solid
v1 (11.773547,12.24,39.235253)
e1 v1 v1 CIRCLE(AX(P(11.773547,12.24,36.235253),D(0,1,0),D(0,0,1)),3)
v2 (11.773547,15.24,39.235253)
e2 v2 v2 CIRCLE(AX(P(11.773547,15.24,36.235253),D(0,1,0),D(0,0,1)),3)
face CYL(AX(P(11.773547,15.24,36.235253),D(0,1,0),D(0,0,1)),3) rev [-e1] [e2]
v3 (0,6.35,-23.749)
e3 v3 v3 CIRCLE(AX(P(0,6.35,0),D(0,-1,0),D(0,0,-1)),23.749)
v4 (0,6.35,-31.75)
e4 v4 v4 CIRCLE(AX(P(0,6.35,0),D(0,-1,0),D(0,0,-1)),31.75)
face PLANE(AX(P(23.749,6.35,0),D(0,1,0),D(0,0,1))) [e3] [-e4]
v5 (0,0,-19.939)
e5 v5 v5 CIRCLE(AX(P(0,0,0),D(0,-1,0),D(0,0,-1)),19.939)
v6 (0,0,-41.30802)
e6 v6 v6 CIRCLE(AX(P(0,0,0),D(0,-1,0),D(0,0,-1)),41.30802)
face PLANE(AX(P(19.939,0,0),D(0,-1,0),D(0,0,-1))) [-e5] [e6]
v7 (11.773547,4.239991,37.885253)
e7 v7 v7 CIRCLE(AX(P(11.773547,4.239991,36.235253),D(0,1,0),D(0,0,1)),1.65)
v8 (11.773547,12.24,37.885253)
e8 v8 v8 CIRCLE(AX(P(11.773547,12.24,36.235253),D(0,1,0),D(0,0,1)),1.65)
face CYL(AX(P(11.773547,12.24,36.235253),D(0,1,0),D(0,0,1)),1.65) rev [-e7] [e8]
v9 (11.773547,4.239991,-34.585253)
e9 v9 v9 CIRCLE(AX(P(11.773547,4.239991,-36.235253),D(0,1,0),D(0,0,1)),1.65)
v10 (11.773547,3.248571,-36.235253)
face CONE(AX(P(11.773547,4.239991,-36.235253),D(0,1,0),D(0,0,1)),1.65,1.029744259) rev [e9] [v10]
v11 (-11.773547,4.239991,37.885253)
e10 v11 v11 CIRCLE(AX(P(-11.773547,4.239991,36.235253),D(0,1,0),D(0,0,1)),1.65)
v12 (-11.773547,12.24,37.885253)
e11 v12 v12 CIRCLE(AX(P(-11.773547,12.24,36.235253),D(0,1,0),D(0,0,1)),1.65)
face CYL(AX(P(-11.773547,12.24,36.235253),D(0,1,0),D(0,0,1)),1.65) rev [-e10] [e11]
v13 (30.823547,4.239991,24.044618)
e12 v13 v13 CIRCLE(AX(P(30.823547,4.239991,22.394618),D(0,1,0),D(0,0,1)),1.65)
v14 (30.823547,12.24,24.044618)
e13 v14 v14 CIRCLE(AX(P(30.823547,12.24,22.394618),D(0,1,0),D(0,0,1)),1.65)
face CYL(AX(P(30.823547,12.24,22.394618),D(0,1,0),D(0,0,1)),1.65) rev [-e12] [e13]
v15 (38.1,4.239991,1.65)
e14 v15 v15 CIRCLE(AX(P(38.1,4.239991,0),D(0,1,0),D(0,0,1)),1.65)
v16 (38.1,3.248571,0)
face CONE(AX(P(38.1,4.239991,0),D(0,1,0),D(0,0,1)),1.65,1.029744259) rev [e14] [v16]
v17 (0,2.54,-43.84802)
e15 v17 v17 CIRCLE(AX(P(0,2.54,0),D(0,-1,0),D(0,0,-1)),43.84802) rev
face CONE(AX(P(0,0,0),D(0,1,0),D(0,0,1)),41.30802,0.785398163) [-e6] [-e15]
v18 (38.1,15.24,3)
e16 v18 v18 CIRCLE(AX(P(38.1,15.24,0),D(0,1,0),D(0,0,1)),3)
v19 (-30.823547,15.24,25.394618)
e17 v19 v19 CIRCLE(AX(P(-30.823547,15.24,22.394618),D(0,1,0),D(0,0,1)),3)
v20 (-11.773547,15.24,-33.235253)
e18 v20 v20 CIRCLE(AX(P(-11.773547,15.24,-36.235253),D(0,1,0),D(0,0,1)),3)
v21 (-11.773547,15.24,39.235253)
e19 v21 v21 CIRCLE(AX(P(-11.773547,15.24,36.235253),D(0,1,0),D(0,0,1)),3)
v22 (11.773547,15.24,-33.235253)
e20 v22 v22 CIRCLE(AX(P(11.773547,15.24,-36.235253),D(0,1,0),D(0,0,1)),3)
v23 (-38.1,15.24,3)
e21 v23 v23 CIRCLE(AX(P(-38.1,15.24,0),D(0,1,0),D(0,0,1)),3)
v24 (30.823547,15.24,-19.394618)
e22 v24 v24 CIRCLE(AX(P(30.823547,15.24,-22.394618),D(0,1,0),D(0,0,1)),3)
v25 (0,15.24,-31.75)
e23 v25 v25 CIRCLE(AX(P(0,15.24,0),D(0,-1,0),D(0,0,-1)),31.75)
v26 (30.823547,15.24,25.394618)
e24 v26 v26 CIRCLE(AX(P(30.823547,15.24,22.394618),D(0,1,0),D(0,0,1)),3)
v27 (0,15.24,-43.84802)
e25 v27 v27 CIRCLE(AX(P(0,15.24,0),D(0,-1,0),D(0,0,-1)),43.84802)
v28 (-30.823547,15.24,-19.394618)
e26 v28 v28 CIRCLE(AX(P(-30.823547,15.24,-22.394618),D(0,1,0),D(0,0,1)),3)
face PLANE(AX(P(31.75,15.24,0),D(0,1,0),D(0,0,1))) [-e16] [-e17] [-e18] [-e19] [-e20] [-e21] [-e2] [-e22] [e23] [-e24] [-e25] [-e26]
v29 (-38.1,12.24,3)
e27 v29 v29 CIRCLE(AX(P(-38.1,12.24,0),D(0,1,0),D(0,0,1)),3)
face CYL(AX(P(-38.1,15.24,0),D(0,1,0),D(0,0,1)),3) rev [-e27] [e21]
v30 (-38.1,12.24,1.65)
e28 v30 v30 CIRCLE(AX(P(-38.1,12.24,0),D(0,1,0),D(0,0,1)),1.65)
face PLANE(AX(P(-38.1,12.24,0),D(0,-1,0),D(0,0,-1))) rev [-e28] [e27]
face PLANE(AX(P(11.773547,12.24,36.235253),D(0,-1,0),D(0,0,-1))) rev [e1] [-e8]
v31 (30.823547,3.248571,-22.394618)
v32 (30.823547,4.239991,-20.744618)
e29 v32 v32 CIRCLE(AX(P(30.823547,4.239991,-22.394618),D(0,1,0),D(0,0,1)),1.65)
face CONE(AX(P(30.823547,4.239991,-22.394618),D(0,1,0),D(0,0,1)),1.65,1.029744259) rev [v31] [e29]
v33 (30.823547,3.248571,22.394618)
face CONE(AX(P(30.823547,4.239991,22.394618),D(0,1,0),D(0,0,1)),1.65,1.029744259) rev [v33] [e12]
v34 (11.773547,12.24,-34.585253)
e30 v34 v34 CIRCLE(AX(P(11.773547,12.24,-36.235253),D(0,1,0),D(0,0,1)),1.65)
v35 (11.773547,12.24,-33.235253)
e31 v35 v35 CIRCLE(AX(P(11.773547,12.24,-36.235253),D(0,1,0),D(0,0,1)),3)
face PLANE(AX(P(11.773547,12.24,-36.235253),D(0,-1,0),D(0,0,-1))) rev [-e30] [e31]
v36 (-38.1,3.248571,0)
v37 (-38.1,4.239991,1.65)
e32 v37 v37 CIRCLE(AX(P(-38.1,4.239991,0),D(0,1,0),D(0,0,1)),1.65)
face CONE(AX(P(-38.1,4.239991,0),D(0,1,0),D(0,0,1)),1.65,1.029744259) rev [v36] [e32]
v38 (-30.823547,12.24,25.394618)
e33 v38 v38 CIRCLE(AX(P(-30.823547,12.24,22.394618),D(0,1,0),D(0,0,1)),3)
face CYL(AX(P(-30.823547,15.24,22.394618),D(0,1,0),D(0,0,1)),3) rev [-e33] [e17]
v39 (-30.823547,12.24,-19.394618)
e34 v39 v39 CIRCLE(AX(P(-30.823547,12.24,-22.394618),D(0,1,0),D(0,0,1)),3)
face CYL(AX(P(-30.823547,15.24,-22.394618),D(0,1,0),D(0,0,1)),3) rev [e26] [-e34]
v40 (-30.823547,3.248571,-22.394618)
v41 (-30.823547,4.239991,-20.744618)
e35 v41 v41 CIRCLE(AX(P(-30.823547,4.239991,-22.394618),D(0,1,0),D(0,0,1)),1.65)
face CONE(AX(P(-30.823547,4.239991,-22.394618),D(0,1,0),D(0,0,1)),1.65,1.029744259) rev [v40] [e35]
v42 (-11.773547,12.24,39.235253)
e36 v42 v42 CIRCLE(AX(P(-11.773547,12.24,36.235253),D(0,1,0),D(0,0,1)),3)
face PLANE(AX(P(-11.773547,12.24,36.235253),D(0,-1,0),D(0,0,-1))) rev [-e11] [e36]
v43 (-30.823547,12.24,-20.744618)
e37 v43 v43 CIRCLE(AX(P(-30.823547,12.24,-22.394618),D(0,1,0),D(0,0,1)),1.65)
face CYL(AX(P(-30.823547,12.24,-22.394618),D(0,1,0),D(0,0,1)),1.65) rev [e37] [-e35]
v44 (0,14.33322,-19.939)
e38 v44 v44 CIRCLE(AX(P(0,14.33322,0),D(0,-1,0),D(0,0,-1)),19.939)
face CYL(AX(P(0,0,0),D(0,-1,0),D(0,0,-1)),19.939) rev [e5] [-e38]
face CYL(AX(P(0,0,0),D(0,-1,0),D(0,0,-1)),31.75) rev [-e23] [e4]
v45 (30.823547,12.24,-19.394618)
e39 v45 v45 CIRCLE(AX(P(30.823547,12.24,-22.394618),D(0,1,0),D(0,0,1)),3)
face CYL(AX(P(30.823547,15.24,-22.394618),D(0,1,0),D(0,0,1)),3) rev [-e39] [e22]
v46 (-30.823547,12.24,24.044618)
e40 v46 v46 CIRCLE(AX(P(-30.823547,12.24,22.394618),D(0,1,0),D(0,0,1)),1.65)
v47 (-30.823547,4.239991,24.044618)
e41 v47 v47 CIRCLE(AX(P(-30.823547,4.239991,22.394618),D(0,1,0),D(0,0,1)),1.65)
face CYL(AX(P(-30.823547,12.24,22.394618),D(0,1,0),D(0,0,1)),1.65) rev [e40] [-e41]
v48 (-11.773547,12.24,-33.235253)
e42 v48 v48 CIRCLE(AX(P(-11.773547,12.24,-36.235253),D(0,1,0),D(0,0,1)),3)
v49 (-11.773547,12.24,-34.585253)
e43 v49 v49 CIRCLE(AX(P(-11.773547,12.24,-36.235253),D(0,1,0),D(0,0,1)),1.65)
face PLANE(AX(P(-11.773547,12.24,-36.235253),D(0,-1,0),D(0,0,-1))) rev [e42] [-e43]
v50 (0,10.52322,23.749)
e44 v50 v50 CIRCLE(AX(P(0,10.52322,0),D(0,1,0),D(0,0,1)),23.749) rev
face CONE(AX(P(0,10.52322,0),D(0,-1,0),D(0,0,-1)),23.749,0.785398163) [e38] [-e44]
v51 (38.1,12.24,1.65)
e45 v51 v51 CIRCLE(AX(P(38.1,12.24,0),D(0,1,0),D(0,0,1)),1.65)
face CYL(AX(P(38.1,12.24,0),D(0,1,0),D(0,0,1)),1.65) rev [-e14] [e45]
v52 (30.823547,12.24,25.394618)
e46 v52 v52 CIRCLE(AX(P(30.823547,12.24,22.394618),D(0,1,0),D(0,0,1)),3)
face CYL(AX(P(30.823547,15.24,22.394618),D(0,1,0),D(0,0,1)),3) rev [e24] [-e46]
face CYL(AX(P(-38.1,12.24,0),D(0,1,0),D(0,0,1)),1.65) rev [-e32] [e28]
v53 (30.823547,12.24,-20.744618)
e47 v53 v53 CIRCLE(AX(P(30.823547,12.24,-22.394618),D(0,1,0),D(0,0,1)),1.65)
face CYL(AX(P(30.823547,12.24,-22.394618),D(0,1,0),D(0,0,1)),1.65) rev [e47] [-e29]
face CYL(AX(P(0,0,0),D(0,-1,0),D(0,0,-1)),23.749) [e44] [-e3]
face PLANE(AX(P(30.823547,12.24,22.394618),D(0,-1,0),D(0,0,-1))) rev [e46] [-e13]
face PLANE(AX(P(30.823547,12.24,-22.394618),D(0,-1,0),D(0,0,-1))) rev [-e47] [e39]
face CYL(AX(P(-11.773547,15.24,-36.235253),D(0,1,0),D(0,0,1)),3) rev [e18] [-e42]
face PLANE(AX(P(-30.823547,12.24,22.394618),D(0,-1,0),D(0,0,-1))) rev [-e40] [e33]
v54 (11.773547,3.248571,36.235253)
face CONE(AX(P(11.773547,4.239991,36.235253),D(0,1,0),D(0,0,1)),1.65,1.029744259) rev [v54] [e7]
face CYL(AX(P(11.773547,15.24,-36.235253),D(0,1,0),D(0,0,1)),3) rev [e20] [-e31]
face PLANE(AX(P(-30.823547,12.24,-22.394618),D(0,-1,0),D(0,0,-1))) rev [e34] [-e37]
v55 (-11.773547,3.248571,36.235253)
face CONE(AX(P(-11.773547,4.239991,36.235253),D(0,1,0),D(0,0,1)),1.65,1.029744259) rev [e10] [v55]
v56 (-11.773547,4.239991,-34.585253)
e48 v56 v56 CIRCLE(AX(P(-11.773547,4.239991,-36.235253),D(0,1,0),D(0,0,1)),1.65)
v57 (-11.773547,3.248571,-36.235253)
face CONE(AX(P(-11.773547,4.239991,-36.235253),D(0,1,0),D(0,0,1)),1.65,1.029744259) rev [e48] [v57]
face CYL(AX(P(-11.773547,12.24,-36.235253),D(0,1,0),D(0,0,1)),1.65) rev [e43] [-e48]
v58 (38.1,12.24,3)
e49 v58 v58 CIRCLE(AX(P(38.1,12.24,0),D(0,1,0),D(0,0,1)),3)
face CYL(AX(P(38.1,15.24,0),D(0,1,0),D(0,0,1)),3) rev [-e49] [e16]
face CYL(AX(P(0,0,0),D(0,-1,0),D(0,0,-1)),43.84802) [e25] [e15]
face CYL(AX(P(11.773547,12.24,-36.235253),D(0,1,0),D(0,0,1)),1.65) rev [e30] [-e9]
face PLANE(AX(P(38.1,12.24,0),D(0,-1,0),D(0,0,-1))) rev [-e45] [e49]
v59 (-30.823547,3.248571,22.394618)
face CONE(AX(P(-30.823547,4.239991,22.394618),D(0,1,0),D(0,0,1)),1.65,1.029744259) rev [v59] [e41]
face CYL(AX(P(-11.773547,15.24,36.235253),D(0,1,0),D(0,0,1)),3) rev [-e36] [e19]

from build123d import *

# Parameters (mm, degrees)
CHAMFER2_SIZE     = 3.81
HOLE1_D           = 6
HOLE1_DEPTH       = 3
CIRPATTERN1_COUNT = 10
CHAMFER3_SIZE     = 2.54


with BuildPart() as part:
    # Sketch1 → Revolve1 (revolve)
    with BuildSketch(Plane.XY, mode=Mode.PRIVATE) as revolve1_sk:
        Polygon((19.939, 0), (43.84802, 0), (43.84802, 15.24), (31.75, 15.24), (31.75, 6.35), (23.749, 6.35), (23.749, 14.33322), (19.939, 14.33322), align=None)
    revolve(revolve1_sk.sketch.rotate(Axis((0, 0, 0), (0, 1, 0)), 90), axis=Axis((0, 0, 0), (0, 1, 0)))

    # Chamfer2
    chamfer2_edges = [part.edges().sort_by_distance(p)[0] for p in [
        (0, 14.33322, 23.749),
    ]]
    chamfer(chamfer2_edges, length=CHAMFER2_SIZE - 0.0001)  # a hair under: the kernel refuses the full size

    # Hole1
    with Locations(Plane(origin=(0, 15.24, 0), x_dir=(1, 0, 0), z_dir=(0, 1, 0))):
        with Locations((38.1, 0)):
            hole1 = Hole(HOLE1_D / 2, depth=HOLE1_DEPTH)

    # Sketch5 → M4x0.7 Tapped Hole1 (revolve, cut)
    with BuildSketch(Plane(origin=(38.1, 12.24, 0), x_dir=(0, 0, 1), z_dir=(1, 0, 0))):
        Polygon((0, 0), (0, 8.991429421), (1.65, 8.0000094), (1.65, 0), align=None)
    m4x0_7_tapped_hole1 = revolve(axis=Axis((38.1, 18.59, 0), (0, -1, 0)), mode=Mode.SUBTRACT)

    # CirPattern1: Hole1, M4x0.7 Tapped Hole1 ×10 about axis
    cirpattern1_axis = Axis((0, 0, 0), (0, 1, 0))
    add([hole1.rotate(cirpattern1_axis, i * 360 / CIRPATTERN1_COUNT) for i in range(1, CIRPATTERN1_COUNT)], mode=Mode.SUBTRACT)
    add([m4x0_7_tapped_hole1.rotate(cirpattern1_axis, i * 360 / CIRPATTERN1_COUNT) for i in range(1, CIRPATTERN1_COUNT)], mode=Mode.SUBTRACT)

    # Chamfer3
    chamfer3_edges = [part.edges().sort_by_distance(p)[0] for p in [
        (0, 0, 43.84802),
    ]]
    chamfer(chamfer3_edges, length=CHAMFER3_SIZE)


solid = part.part
